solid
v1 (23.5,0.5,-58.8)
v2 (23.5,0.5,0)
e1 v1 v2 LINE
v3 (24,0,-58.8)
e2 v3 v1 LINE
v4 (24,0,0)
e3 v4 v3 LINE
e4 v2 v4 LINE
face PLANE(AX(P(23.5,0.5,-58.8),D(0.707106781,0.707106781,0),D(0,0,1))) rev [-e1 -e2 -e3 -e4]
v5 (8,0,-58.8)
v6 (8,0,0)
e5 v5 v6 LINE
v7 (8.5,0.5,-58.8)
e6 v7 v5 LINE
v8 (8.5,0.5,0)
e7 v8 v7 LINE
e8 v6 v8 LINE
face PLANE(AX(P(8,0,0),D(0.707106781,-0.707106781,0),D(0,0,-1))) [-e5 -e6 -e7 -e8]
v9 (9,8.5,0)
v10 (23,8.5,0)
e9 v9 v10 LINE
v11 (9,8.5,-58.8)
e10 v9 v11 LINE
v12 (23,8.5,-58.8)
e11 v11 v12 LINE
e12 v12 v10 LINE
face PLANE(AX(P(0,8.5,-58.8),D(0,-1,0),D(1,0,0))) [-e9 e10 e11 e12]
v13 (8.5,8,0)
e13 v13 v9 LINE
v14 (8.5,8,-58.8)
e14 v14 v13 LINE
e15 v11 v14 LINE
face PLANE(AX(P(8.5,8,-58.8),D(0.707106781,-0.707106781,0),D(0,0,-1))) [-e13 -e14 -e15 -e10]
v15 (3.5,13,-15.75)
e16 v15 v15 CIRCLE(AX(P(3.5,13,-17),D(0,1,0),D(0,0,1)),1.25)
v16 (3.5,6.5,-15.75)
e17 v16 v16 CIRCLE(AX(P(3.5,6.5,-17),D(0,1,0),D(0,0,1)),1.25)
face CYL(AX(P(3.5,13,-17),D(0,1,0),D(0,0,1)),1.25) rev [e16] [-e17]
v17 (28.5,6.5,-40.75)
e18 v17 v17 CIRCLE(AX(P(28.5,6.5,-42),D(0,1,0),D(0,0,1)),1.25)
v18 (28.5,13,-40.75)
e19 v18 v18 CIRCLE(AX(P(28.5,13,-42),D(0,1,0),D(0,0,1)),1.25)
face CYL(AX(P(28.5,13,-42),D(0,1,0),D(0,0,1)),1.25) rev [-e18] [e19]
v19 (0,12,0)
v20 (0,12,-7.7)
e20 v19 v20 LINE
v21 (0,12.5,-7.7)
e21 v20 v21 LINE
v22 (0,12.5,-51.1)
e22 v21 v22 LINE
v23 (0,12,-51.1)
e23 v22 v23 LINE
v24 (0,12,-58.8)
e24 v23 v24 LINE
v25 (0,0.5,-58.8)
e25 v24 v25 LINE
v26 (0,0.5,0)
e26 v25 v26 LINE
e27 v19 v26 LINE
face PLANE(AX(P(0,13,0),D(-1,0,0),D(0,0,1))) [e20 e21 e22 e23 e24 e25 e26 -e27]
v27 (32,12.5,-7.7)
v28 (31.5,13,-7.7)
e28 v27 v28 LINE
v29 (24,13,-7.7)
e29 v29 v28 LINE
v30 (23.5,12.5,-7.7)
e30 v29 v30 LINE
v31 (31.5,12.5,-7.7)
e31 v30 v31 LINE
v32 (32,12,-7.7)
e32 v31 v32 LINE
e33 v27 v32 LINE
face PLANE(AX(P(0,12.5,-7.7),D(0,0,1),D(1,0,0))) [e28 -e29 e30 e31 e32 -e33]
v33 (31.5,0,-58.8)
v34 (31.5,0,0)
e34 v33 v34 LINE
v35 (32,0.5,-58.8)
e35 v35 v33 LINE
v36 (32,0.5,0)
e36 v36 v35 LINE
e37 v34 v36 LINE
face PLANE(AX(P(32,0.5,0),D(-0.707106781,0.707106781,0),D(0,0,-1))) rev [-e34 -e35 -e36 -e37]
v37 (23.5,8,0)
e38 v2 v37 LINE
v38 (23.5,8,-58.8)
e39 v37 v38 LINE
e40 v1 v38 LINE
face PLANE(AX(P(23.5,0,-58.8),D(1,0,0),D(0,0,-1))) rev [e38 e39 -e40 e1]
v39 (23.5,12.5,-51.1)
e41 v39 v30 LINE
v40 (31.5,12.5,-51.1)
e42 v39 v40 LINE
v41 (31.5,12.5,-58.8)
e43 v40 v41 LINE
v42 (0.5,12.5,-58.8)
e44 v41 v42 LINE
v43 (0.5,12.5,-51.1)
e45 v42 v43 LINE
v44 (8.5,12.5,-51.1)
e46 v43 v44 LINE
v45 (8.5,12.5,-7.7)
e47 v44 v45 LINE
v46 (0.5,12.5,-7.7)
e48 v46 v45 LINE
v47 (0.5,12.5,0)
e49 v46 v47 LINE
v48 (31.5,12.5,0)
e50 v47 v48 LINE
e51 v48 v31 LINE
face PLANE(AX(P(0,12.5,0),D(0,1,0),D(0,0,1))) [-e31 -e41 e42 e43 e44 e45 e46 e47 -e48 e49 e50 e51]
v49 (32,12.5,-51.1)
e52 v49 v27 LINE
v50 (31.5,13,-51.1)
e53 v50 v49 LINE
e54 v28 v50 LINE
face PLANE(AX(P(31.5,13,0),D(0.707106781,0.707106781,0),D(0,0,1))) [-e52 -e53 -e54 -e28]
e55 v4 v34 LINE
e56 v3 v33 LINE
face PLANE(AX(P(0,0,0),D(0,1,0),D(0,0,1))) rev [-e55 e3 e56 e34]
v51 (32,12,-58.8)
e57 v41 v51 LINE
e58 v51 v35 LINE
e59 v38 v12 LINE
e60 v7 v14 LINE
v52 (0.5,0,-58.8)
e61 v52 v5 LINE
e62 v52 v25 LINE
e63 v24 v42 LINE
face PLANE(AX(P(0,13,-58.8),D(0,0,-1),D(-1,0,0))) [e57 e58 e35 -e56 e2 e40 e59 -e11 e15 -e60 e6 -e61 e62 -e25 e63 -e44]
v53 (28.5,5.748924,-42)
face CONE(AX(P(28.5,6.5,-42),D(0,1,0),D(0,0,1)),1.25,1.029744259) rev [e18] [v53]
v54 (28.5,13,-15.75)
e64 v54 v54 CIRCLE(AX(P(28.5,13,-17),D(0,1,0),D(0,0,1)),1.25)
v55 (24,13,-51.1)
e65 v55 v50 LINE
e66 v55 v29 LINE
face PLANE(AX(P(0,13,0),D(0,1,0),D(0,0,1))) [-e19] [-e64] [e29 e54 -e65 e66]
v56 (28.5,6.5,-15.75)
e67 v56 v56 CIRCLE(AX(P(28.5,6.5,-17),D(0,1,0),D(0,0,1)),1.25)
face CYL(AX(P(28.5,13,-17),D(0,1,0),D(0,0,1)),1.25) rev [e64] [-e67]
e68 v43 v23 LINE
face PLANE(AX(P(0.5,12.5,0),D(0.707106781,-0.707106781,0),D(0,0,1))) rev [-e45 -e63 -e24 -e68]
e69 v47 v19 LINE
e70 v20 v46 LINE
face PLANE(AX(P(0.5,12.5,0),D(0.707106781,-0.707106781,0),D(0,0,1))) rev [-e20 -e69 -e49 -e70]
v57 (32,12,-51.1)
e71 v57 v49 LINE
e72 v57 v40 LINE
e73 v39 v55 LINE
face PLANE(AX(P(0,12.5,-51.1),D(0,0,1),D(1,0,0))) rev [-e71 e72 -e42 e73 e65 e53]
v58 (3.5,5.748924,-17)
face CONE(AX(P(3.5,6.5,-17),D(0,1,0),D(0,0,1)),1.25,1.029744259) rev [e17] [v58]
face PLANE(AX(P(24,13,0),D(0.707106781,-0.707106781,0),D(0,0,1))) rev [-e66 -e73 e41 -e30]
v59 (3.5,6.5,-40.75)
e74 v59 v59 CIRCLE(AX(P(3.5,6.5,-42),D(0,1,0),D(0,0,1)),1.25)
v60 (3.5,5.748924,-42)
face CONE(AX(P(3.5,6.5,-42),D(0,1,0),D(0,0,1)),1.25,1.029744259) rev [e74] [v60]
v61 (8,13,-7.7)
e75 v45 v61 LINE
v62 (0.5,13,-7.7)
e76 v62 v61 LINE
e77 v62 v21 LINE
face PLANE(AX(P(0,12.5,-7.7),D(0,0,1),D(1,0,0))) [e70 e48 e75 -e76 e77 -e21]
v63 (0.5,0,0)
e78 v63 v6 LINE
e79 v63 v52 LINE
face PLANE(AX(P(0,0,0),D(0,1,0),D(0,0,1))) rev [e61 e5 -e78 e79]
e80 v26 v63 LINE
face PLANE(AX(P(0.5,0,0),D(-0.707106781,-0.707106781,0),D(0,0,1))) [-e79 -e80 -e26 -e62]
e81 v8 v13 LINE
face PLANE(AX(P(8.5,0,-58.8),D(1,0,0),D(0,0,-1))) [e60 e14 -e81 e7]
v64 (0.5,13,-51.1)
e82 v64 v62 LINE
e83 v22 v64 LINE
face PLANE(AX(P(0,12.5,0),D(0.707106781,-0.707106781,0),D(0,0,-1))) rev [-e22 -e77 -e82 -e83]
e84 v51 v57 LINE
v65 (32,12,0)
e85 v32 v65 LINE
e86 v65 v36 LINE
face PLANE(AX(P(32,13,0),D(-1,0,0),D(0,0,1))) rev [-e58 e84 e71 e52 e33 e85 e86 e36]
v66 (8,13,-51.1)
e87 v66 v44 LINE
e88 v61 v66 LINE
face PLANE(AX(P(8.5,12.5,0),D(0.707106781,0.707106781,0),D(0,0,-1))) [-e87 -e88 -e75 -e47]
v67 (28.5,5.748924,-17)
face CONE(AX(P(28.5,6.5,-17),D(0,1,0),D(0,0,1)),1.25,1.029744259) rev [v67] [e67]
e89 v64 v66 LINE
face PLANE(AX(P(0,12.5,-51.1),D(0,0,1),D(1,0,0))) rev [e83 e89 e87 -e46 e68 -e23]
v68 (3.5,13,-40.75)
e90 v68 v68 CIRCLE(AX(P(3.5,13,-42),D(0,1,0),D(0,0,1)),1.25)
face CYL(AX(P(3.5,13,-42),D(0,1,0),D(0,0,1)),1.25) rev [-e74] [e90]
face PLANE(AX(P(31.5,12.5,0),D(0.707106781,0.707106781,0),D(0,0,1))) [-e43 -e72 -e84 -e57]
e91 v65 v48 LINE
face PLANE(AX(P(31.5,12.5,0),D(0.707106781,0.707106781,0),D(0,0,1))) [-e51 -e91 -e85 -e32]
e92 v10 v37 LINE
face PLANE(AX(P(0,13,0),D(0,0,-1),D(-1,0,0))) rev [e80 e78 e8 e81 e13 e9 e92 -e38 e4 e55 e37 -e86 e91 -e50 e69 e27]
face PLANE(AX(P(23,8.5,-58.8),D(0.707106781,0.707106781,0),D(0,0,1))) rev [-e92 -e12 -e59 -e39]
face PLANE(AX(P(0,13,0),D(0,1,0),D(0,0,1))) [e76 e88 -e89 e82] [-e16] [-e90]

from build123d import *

# Parameters (mm, degrees)
SKETCH1_W                 = 32
SKETCH1_H                 = 43.4
SKETCH1_H_2               = 7.7
BOSS_EXTRUDE1_DEPTH       = 13
M3X0_5_TAPPED_HOLE1_D     = 2.5
M3X0_5_TAPPED_HOLE1_DEPTH = 6.5
M3X0_5_TAPPED_HOLE1_TIP   = 0.751075774
CUT_EXTRUDE1_DEPTH        = 69.194134645
SKETCH5_W                 = 15
SKETCH5_H                 = 43.4
CUT_EXTRUDE2_DEPTH        = 0.5
CHAMFER1_SIZE             = 0.5


with BuildPart() as part:
    # Sketch1 → Boss-Extrude1 (new body)
    with BuildSketch(Plane(origin=(0, 0, 0), x_dir=(1, 0, 0), z_dir=(0, 1, 0))):
        with Locations((16, 29.4)):
            Rectangle(SKETCH1_W, SKETCH1_H)
        with Locations((16, 3.85)):
            Rectangle(SKETCH1_W, SKETCH1_H_2)
        with Locations((16, 54.95)):
            Rectangle(SKETCH1_W, SKETCH1_H_2)
    extrude(amount=BOSS_EXTRUDE1_DEPTH)

    # M3x0.5 Tapped Hole1
    with Locations(Plane(origin=(0, 13, 0), x_dir=(1, 0, 0), z_dir=(0, 1, 0))):
        with Locations((28.5, 17), (28.5, 42), (3.5, 42), (3.5, 17)):
            Hole(M3X0_5_TAPPED_HOLE1_D / 2, depth=M3X0_5_TAPPED_HOLE1_DEPTH)
            with Locations((0, 0, -(M3X0_5_TAPPED_HOLE1_DEPTH + M3X0_5_TAPPED_HOLE1_TIP / 2))):  # 118° drill point
                Cone(0, M3X0_5_TAPPED_HOLE1_D / 2, M3X0_5_TAPPED_HOLE1_TIP, mode=Mode.SUBTRACT)

    # Sketch4 → Cut-Extrude1 (cut, through all)
    with BuildSketch(Plane.XY):
        Polygon((8.5, 8.5), (8.5, 0), (23.5, 0), (23.5, 8.5), (16, 8.5), align=None)
    extrude(amount=-CUT_EXTRUDE1_DEPTH, mode=Mode.SUBTRACT)

    # Sketch5 → Cut-Extrude2 (cut)
    with BuildSketch(Plane(origin=(0, 13, 0), x_dir=(1, 0, 0), z_dir=(0, 1, 0))):
        Polygon((0, 58.8), (0, 51.1), (8.5, 51.1), (23.5, 51.1), (32, 51.1), (32, 58.8), align=None)
        Polygon((8.5, 7.7), (0, 7.7), (0, 0), (32, 0), (32, 7.7), (23.5, 7.7), align=None)
        with Locations((16, 29.4)):
            Rectangle(SKETCH5_W, SKETCH5_H)
    extrude(amount=-CUT_EXTRUDE2_DEPTH, mode=Mode.SUBTRACT)

    # Chamfer1
    chamfer1_edges = [part.edges().sort_by_distance(p)[0] for p in [
        (0, 13, -29.4),
        (8.5, 13, -29.4),
        (0, 12.5, -3.85),
        (0, 12.5, -54.95),
        (0, 0, -29.4),
        (32, 12.5, -3.85),
        (32, 12.5, -54.95),
        (8.5, 0, -29.4),
        (8.5, 8.5, -29.4),
        (23.5, 8.5, -29.4),
        (23.5, 0, -29.4),
        (32, 0, -29.4),
        (32, 13, -29.4),
        (23.5, 13, -29.4),
    ]]
    chamfer(chamfer1_edges, length=CHAMFER1_SIZE - 0.0001)  # a hair under: the kernel refuses the full size


solid = part.part
